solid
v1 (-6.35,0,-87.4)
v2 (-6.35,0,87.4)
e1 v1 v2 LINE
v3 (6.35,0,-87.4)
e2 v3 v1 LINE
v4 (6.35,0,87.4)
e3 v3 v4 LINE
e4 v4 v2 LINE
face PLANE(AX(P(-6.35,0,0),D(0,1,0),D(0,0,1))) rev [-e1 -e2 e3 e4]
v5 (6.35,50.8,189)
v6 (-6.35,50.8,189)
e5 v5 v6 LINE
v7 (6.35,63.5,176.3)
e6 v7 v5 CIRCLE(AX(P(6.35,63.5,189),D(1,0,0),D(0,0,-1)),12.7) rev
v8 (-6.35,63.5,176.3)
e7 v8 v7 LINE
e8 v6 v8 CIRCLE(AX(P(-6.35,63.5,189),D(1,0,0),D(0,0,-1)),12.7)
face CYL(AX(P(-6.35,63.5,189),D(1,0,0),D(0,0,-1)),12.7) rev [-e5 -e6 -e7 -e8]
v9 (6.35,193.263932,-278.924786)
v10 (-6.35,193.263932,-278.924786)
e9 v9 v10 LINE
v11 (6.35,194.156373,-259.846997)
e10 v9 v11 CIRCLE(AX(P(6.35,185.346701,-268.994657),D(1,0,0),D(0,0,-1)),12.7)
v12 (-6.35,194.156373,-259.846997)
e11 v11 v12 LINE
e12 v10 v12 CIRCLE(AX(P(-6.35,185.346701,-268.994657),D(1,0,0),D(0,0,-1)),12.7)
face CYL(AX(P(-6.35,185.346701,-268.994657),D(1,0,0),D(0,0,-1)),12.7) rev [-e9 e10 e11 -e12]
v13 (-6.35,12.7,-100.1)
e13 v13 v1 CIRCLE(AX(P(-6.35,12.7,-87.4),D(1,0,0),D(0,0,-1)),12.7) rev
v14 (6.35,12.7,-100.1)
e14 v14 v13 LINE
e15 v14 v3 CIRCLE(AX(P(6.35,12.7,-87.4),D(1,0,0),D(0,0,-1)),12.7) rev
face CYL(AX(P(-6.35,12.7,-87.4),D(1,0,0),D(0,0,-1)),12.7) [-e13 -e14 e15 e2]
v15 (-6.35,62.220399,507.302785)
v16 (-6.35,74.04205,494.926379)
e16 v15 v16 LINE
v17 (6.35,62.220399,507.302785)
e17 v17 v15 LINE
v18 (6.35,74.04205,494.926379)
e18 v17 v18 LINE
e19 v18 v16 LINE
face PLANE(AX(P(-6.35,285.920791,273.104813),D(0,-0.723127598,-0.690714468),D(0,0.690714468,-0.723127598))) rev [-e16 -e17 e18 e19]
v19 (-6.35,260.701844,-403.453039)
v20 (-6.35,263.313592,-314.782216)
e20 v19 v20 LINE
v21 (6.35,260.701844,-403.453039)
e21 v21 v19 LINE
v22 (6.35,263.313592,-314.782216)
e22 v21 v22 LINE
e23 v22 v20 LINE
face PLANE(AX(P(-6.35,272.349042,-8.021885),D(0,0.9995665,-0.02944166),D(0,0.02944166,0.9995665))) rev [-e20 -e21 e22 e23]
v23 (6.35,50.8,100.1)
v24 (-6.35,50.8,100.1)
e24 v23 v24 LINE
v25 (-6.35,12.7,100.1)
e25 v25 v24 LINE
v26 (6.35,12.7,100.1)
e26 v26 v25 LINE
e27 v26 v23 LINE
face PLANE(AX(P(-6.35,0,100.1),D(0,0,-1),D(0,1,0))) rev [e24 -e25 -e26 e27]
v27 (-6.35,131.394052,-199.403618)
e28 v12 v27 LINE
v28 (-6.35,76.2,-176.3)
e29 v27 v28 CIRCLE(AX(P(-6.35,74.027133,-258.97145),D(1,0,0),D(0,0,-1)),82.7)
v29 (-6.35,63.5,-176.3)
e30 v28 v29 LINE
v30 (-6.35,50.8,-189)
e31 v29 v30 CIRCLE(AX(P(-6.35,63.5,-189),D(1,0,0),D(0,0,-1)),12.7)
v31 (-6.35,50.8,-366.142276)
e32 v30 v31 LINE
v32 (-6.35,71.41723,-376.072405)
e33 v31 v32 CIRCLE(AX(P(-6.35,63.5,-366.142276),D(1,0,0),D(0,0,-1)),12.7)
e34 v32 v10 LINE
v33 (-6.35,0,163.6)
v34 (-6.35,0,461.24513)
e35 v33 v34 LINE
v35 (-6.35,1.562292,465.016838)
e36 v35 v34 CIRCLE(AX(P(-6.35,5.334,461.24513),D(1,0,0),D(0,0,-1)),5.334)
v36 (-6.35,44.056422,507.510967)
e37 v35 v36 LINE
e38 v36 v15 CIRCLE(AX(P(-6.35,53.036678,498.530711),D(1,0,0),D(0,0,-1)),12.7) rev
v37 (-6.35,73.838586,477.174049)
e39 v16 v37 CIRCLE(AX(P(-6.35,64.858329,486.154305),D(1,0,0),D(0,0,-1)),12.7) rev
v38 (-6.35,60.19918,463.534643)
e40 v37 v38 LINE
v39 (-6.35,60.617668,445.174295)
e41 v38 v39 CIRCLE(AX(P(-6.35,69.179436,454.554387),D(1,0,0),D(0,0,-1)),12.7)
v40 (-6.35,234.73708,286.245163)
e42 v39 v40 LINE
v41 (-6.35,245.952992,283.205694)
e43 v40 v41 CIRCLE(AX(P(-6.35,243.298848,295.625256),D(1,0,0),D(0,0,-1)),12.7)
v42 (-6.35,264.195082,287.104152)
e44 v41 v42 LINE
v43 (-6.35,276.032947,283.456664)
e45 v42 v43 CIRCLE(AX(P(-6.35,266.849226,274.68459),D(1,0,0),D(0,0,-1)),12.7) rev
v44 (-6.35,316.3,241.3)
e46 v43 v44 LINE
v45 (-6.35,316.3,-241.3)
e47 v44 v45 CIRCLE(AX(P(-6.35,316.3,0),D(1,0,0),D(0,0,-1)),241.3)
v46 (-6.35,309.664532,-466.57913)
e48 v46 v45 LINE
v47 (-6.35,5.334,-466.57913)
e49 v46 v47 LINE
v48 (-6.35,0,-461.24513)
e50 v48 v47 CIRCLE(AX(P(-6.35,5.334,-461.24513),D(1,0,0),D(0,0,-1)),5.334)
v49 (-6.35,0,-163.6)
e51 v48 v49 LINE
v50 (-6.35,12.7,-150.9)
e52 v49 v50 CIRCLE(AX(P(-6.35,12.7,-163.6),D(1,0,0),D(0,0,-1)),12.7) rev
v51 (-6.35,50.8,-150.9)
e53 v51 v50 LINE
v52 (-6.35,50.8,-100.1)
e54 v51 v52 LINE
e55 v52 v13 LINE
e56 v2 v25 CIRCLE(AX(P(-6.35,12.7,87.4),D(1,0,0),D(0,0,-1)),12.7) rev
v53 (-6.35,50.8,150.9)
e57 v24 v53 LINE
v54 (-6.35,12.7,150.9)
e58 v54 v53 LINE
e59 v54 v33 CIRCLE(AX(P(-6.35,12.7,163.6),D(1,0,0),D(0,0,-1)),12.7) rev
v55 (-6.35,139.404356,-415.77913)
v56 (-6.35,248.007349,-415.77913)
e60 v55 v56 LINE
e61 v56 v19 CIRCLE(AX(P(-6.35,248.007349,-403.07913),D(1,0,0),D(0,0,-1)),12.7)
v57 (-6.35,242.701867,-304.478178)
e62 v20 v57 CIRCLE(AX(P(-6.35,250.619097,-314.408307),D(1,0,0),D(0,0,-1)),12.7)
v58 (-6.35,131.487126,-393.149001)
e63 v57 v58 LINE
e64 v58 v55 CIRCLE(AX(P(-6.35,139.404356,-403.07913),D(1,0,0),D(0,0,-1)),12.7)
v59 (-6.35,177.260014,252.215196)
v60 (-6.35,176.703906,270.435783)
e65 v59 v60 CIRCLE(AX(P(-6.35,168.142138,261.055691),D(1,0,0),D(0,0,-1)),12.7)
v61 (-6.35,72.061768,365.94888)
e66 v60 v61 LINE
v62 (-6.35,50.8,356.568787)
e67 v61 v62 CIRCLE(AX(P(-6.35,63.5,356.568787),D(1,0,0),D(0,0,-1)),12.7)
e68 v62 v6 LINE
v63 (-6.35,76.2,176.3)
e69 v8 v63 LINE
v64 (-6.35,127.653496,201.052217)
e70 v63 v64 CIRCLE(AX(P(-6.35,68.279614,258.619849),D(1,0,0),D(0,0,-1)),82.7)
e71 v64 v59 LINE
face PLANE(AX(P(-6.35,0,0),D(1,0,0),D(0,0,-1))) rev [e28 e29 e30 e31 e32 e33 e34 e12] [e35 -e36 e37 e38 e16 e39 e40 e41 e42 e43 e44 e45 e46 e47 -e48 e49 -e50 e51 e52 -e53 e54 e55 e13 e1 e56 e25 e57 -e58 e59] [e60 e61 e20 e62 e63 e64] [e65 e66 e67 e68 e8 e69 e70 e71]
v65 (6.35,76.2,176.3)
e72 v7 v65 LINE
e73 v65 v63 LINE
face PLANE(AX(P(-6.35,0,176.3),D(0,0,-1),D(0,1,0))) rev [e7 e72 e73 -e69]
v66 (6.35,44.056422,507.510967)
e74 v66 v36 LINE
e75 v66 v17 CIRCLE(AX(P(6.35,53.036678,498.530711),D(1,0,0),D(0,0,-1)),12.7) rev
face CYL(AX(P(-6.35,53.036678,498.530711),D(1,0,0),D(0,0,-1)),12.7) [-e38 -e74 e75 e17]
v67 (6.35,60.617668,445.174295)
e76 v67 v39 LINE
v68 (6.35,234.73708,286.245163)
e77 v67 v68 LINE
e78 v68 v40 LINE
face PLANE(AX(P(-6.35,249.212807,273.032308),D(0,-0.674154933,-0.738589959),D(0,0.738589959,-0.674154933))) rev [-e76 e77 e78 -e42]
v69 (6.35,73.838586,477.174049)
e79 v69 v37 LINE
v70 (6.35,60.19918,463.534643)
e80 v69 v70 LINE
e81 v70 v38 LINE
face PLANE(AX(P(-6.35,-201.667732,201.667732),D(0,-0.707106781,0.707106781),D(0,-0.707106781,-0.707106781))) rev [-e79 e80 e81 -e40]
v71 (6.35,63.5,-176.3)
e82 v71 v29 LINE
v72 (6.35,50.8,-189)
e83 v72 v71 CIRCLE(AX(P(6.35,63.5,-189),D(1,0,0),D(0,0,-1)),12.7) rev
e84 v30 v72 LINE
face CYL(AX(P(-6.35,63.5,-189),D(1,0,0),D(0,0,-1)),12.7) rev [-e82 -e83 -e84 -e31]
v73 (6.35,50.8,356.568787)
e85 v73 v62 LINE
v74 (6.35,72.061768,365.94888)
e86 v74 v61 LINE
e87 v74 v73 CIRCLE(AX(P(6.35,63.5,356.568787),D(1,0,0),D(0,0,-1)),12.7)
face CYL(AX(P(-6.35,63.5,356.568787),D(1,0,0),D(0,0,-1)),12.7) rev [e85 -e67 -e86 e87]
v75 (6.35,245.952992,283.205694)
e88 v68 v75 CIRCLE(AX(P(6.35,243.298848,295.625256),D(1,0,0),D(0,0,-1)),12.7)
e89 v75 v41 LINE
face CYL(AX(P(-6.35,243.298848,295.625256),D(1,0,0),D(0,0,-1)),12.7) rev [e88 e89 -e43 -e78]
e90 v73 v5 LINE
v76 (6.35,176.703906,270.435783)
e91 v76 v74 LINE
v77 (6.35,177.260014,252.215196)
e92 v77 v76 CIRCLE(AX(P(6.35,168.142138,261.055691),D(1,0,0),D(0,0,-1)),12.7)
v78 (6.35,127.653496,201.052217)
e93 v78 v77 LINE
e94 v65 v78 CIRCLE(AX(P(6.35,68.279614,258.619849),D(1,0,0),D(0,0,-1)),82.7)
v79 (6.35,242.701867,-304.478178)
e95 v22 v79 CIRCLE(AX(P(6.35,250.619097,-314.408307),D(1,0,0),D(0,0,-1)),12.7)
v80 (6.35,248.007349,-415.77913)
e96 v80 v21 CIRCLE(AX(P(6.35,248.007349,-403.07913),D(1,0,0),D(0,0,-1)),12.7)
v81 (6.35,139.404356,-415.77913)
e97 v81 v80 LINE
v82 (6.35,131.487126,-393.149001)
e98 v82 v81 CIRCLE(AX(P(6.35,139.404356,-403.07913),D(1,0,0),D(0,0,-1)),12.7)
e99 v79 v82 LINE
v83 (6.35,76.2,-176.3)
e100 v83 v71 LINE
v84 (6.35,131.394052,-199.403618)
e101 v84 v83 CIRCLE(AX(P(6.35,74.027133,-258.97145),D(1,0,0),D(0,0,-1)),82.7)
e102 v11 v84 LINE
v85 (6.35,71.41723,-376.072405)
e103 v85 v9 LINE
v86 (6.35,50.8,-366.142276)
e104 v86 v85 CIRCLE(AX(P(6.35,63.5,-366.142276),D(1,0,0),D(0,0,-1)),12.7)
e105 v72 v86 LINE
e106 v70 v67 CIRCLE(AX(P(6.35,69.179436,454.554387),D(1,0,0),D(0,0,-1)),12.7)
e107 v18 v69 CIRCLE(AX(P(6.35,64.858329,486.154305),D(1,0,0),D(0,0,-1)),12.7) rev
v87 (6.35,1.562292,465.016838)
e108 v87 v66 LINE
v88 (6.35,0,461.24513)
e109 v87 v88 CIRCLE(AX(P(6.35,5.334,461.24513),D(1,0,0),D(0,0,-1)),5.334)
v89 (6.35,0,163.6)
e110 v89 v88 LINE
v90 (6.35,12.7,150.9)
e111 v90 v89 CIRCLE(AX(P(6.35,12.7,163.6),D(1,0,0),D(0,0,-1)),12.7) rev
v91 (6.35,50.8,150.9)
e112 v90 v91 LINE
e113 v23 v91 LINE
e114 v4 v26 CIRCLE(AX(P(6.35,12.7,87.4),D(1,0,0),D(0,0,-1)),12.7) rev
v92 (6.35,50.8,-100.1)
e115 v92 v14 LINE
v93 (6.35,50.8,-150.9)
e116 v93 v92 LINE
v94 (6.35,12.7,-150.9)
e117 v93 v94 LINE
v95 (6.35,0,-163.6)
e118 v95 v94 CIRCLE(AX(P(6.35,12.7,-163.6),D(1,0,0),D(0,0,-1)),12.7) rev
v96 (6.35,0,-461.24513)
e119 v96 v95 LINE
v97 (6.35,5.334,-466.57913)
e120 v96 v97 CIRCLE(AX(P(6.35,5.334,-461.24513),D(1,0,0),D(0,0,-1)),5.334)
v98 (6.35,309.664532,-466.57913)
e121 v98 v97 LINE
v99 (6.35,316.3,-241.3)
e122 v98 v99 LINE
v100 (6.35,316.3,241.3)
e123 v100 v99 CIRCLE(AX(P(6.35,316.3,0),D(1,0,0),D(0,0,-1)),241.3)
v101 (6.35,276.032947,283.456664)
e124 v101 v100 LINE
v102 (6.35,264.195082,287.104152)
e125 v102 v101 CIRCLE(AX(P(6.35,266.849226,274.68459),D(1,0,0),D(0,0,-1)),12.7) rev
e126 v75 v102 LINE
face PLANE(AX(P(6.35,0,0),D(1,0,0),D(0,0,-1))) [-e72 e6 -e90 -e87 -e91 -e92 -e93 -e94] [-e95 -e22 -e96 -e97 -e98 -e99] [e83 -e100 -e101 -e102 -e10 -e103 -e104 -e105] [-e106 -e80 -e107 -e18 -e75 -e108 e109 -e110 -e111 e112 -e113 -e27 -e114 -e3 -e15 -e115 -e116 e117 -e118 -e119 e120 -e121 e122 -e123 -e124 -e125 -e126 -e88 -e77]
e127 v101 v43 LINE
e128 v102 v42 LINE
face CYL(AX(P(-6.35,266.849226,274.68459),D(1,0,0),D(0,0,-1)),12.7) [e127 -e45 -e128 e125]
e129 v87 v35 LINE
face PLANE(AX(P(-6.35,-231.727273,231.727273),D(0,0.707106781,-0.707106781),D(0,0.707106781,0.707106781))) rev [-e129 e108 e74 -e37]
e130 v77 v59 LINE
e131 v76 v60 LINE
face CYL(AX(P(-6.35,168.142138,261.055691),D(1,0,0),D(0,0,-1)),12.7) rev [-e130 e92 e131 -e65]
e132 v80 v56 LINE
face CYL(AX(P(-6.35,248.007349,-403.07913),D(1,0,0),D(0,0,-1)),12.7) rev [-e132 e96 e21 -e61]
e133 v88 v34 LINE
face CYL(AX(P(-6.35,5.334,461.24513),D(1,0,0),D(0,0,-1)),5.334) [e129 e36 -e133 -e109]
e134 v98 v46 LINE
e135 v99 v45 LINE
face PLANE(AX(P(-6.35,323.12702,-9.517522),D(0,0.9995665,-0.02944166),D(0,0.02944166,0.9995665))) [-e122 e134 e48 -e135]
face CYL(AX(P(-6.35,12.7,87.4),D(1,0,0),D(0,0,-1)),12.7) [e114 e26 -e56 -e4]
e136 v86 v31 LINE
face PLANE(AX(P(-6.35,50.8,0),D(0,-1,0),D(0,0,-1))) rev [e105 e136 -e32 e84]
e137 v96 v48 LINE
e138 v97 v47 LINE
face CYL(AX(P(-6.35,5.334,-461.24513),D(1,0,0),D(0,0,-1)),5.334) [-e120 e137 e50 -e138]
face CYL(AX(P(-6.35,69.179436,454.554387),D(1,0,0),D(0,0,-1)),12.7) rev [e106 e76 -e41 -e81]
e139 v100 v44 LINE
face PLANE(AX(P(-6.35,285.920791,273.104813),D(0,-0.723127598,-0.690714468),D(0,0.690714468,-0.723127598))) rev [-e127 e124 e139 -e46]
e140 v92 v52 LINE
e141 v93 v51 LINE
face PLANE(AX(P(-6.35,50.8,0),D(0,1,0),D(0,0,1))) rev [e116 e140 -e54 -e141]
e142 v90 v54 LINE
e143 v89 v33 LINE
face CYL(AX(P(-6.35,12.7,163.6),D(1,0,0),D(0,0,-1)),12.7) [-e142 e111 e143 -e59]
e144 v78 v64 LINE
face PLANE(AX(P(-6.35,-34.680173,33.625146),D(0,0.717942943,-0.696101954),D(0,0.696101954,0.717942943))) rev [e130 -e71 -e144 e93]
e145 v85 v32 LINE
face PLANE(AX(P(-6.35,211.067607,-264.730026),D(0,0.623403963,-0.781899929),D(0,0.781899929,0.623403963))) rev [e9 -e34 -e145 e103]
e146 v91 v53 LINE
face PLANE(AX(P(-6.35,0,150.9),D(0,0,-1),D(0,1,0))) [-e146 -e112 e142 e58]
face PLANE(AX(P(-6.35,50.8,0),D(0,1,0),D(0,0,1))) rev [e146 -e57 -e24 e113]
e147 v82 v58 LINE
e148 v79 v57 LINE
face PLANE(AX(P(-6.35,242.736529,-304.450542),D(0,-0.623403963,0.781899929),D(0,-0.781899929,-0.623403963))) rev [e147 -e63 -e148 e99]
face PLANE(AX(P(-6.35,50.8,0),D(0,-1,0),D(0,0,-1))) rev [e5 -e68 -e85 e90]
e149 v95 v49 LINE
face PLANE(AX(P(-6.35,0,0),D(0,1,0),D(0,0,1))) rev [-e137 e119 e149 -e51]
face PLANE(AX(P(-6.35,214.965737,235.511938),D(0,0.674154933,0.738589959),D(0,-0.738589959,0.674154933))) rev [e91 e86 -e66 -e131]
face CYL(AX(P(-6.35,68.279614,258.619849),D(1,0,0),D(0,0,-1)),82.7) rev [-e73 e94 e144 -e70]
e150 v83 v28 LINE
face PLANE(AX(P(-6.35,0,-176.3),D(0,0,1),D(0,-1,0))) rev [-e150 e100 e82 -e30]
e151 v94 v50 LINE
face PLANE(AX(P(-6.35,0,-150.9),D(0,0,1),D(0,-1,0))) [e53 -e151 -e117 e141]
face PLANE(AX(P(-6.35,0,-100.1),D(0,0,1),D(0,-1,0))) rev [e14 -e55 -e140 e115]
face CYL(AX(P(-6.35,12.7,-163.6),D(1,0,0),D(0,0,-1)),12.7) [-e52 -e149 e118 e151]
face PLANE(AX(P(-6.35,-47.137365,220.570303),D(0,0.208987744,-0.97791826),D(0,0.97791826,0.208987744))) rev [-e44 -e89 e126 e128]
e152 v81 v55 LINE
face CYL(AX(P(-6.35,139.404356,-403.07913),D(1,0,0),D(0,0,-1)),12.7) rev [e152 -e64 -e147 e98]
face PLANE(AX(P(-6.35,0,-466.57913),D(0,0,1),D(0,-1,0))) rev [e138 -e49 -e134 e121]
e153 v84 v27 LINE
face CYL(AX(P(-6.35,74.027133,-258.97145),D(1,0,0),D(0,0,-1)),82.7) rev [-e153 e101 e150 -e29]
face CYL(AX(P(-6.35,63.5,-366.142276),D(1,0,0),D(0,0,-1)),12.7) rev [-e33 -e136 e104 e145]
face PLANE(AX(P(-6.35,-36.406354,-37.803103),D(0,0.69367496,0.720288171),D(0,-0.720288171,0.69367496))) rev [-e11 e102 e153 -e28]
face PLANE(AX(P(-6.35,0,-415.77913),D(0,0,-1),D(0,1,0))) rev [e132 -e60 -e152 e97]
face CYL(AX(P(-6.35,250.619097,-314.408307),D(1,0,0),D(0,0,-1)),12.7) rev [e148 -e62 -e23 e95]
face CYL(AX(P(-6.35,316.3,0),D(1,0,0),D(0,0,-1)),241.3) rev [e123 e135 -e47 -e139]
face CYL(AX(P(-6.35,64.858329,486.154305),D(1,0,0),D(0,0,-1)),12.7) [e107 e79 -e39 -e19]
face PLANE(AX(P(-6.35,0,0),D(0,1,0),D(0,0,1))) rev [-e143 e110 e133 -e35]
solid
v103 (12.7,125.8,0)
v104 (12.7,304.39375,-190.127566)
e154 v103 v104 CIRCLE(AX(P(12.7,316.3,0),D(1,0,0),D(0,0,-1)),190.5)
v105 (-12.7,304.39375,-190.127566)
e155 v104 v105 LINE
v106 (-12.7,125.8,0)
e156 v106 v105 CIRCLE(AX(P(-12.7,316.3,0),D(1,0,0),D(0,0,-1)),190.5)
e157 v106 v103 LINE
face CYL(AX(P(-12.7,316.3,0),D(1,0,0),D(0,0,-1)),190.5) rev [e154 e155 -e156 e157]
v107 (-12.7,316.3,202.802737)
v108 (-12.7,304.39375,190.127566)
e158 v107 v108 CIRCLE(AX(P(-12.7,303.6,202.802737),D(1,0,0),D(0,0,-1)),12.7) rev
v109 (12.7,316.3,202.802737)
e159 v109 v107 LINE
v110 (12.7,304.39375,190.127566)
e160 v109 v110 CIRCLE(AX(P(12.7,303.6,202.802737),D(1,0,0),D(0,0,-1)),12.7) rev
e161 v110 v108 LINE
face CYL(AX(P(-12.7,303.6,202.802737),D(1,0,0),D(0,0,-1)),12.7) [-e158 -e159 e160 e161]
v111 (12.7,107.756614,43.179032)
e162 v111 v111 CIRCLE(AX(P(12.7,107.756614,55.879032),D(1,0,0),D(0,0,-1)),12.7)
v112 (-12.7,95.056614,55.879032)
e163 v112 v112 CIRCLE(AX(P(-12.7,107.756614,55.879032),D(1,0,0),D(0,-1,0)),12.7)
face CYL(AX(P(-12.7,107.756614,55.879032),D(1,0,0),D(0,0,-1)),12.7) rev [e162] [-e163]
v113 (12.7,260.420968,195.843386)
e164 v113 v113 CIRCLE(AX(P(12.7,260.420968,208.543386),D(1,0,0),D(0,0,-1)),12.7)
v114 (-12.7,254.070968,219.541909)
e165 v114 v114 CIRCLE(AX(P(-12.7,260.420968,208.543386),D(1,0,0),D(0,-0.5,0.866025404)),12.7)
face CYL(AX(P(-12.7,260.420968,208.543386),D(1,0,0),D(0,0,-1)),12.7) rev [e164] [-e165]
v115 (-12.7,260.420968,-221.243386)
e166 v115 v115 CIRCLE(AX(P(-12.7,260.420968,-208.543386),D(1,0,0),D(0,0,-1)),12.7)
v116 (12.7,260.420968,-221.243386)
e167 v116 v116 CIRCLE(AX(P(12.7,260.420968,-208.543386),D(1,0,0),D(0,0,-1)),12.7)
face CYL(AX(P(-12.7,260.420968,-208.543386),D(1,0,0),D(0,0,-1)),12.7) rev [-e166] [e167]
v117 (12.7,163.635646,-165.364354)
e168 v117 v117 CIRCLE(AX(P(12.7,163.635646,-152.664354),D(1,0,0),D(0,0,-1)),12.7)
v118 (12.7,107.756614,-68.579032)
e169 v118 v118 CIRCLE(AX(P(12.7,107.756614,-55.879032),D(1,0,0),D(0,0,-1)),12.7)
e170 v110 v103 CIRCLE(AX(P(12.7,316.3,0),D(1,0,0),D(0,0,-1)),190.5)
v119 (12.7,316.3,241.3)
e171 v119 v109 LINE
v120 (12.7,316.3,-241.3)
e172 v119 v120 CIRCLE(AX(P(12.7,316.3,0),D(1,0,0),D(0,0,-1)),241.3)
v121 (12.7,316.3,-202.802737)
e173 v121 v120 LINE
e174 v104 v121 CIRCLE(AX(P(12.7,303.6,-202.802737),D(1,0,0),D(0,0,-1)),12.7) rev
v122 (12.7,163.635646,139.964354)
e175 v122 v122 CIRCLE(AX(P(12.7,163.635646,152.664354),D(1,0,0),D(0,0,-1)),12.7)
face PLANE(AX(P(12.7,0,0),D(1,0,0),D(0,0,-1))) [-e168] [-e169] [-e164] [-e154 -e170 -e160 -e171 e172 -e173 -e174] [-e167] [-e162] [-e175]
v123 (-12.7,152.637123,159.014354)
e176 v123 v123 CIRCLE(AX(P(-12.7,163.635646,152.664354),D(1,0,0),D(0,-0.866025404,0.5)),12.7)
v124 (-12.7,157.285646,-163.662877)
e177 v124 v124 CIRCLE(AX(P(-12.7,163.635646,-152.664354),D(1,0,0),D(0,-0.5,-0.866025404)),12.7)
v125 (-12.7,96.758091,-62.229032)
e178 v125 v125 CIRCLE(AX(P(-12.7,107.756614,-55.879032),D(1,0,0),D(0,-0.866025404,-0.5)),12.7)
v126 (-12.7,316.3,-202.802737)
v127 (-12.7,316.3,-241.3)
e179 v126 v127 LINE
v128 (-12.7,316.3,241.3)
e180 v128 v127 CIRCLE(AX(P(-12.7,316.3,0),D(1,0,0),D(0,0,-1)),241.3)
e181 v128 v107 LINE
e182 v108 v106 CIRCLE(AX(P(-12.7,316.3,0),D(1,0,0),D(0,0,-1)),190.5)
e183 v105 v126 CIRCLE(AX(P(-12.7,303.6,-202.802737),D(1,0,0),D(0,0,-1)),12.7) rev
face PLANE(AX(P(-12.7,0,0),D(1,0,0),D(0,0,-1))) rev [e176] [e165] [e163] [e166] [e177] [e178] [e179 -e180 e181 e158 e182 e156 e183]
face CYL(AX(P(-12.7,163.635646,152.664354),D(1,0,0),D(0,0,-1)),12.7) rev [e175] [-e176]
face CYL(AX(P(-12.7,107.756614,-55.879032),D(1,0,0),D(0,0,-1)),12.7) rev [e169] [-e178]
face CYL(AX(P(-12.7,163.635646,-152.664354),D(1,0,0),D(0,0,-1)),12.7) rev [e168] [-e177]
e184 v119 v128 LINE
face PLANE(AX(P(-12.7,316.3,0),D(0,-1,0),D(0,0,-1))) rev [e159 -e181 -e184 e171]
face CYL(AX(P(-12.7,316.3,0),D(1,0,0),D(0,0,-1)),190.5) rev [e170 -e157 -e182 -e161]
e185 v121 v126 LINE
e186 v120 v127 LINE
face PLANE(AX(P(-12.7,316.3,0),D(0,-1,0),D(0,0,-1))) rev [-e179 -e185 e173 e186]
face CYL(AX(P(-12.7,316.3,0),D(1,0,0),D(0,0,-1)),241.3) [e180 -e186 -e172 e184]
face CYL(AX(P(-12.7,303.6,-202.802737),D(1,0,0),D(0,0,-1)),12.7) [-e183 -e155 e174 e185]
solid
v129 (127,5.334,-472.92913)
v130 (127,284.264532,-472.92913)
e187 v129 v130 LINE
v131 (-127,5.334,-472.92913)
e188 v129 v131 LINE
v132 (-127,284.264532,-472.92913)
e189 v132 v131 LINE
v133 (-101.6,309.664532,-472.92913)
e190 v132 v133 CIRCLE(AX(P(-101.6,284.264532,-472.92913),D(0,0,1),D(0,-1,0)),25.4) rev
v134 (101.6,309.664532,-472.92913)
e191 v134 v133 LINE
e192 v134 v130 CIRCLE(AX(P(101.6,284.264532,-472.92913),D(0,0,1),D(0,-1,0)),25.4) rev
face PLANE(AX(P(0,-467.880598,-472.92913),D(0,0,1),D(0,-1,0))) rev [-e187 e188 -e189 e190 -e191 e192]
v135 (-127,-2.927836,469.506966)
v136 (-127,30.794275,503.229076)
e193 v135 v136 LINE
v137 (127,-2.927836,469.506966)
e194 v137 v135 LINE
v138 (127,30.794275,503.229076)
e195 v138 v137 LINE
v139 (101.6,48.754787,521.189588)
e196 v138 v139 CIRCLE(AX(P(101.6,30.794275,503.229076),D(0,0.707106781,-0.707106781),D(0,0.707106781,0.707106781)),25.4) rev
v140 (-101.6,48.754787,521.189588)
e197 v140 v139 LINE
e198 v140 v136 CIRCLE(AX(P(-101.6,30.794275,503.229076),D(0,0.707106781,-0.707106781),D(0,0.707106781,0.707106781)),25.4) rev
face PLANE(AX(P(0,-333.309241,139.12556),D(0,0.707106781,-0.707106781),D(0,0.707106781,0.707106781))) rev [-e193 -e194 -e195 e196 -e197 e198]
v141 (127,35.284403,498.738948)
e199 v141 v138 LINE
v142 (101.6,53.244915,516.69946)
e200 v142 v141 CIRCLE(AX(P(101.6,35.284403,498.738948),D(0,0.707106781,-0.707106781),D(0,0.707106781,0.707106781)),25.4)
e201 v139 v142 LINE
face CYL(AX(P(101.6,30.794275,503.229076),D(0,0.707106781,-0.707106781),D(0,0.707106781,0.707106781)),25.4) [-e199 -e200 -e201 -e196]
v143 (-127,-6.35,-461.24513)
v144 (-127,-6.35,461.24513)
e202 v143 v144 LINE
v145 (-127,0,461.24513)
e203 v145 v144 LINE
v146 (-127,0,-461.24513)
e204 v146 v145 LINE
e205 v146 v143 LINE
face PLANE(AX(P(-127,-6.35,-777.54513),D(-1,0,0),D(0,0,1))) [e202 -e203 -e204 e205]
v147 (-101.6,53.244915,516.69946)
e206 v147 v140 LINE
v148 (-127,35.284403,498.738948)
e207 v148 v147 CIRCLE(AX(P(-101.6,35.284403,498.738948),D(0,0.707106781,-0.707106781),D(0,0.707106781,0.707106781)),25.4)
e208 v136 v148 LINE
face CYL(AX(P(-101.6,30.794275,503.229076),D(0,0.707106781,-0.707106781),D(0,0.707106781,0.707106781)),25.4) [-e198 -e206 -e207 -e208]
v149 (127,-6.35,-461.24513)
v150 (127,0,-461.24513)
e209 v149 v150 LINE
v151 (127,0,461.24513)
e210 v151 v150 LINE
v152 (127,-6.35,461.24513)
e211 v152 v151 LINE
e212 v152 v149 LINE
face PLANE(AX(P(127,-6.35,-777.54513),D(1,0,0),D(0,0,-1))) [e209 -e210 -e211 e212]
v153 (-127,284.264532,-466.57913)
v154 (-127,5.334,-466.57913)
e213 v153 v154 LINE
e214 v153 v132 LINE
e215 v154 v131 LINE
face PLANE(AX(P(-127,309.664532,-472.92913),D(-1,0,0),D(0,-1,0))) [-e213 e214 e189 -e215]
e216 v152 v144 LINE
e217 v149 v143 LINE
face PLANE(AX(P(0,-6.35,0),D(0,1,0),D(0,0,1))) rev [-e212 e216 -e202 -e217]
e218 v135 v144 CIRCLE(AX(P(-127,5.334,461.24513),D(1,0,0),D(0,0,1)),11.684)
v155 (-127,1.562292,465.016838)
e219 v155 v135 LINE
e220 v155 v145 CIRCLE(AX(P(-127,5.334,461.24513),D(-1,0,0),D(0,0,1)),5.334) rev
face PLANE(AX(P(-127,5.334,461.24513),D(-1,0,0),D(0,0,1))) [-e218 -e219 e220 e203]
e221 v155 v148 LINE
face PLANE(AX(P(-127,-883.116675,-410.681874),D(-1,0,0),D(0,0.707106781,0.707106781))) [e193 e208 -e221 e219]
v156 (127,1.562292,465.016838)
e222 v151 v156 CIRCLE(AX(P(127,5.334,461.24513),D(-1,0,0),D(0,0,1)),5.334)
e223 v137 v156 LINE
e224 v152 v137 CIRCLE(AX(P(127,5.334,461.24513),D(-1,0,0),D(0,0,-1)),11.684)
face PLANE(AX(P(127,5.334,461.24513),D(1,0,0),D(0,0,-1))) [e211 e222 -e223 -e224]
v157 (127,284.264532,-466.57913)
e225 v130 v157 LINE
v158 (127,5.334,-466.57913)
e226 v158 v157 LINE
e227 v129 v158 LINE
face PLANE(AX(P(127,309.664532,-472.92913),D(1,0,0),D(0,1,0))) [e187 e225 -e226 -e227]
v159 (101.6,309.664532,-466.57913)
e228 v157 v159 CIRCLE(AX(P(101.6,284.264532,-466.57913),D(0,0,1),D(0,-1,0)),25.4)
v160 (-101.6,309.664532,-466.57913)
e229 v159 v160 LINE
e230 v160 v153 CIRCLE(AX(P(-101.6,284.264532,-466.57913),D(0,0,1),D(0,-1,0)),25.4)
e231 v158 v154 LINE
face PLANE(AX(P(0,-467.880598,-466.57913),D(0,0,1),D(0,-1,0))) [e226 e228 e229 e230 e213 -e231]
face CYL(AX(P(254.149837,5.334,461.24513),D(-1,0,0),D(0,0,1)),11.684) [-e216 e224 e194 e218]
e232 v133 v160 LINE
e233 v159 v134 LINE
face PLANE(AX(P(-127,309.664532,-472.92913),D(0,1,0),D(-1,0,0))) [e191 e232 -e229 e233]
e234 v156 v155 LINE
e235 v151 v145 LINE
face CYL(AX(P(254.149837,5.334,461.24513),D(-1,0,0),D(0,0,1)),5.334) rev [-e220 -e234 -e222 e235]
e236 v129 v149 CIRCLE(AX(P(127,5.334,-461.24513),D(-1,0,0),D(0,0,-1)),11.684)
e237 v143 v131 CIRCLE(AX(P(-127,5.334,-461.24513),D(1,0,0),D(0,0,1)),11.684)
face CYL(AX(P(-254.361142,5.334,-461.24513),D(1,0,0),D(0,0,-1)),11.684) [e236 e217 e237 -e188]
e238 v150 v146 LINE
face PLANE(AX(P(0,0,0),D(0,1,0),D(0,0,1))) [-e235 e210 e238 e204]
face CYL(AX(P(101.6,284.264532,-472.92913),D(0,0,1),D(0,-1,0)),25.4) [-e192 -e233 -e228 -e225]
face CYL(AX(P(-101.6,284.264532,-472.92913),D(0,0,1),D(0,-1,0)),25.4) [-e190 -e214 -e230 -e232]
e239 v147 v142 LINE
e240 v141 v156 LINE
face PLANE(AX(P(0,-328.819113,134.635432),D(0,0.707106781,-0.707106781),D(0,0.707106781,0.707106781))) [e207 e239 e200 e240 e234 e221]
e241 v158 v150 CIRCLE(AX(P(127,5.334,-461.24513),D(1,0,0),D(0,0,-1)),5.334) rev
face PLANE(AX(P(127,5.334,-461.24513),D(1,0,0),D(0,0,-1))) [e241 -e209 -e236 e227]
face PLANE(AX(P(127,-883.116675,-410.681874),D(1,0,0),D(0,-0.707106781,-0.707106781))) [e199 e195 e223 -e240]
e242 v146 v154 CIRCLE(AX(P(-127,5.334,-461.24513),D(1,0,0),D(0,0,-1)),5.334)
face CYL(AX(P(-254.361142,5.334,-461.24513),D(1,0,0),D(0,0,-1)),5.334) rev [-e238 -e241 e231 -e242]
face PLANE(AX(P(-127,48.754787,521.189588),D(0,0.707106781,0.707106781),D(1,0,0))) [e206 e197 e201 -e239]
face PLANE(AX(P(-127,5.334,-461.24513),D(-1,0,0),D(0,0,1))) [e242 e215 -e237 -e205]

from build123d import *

# Parameters (mm, degrees)
FLANGE_PROFILE_DEPTH              = 12.7
F_7_8_1_DIAMETER_HOLE1_D          = 25.4
BOLT_PATTERN_COUNT                = 12
SKETCH5_W                         = 254
SKETCH5_H                         = 1317.865260112
BASE_SKID_DEPTH                   = 6.35
BEND_START                        = -127
BEND_HEEL_DEPTH                   = 254
BEND_HEEL_2_DEPTH                 = 254
BEND_TOE_DEPTH                    = 254
BEND_TOE_2_DEPTH                  = 254
WEBBING_BODY_DEPTH                = 6.35
WEBBING_HOLES_DEPTH               = 623.746559258
WEBBING_HOLES_DEPTH_BACK          = 623.746559258
CROSSBEAM_DEPTH                   = 623.746559258
CROSSBEAM_DEPTH_BACK              = 623.746559258
CROSSMEMBER_W                     = 50.8
CROSSMEMBER_H                     = 50.8
CROSSBEAM_CLEARANCE_DEPTH         = 6.35
CROSSBEAM_FILLET_R                = 12.7
FILLET_CLEARANCE_R                = 82.7
WEBBING_FILLET_R                  = 12.7
SKID_START                        = -474
SKID_EDGES_DEPTH                  = 8
SKID_START_2                      = -335
SKID_EDGES_2_DEPTH                = 8
FLANGE_FILLET_R                   = 12.7
CONVERT_START                     = -12.7
CONVERT_FLANGE_TO_SHEET_OUTLINE_R = 12.7
CONVERT_FLANGE_TO_SHEET_DEPTH     = 25.4
CONVERT_START_2                   = -6.35
CONVERT_WEBBING_TO_SHEET_DEPTH    = 12.7
FILLET2_R                         = 12.7


with BuildPart() as part:
    # Sketch1 → Flange Profile (new, symmetric)
    with BuildSketch(Plane(origin=(0, 0, 0), x_dir=(0, 0, -1), z_dir=(1, 0, 0))):
        with BuildLine():
            Line((241.3, 316.3), (190.5, 316.3))
            ThreePointArc((190.5, 316.3), (0, 125.8), (-190.5, 316.3))
            Line((-190.5, 316.3), (-241.3, 316.3))
            ThreePointArc((-241.3, 316.3), (0, 75), (241.3, 316.3))
        make_face()
    extrude(amount=FLANGE_PROFILE_DEPTH, both=True)

    # 7/8 (1) Diameter Hole1 (through all)
    with Locations(Plane(origin=(12.7, 260.420968162, -208.543385896), x_dir=(0, 0, 1), z_dir=(1, 0, 0))):
        with Locations((0, 0)):
            f_7_8_1_diameter_hole1 = Hole(F_7_8_1_DIAMETER_HOLE1_D / 2)

    # Bolt Pattern: 7/8 (1) Diameter Hole1 ×12 about axis
    bolt_pattern_axis = Axis((0, 316.3, 0), (1, 0, 0))
    for i in range(1, BOLT_PATTERN_COUNT):
        add(f_7_8_1_diameter_hole1.rotate(bolt_pattern_axis, i * 360 / BOLT_PATTERN_COUNT), mode=Mode.SUBTRACT)

    # Flange Fillet
    flange_fillet_edges = [part.edges().sort_by_distance(p)[0] for p in [
        (0, 316.3, 190.5),
        (0, 316.3, -190.5),
    ]]
    fillet(flange_fillet_edges, radius=FLANGE_FILLET_R)


with BuildPart() as body_2:
    # Base Skid: sheet metal written as solids
    # Sketch5 → Base Skid (new body)
    with BuildSketch(Plane(origin=(0, 0, 0), x_dir=(1, 0, 0), z_dir=(0, 1, 0))):
        with Locations((0, 118.6125)):
            Rectangle(SKETCH5_W, SKETCH5_H)
    extrude(amount=-BASE_SKID_DEPTH)

    # Bend Heel: read off the stored shape, not the designer's step
    # Bend Heel outline → Bend Heel (cut)
    with BuildSketch(Plane.YZ.offset(BEND_START)):
        with BuildLine():
            Line((0, -777.545130056), (0, -471.640528076))
            ThreePointArc((0, -471.640528076), (-4.636915504, -467.33583609), (-6.35, -461.245130056))
            Line((-6.35, -461.245130056), (-6.35, -777.545130056))
            Line((-6.35, -777.545130056), (0, -777.545130056))
        make_face()
    extrude(amount=BEND_HEEL_DEPTH, mode=Mode.SUBTRACT)

    # Bend Heel 2 outline → Bend Heel 2 (add)
    with BuildSketch(Plane.YZ.offset(BEND_START)):
        with BuildLine():
            Line((5.334, -472.929130056), (309.66453199, -472.929130056))
            Line((309.66453199, -472.929130056), (309.66453199, -466.579130056))
            Line((309.66453199, -466.579130056), (5.334, -466.579130056))
            ThreePointArc((5.334, -466.579130056), (1.56229243, -465.016837626), (0, -461.245130056))
            Line((0, -461.245130056), (0, -471.640528076))
            ThreePointArc((0, -471.640528076), (2.590277571, -472.602411563), (5.334, -472.929130056))
        make_face()
    extrude(amount=BEND_HEEL_2_DEPTH)

    # Bend Toe: read off the stored shape, not the designer's step
    # Bend Toe outline → Bend Toe (cut)
    with BuildSketch(Plane.YZ.offset(BEND_START)):
        with BuildLine():
            Line((-6.35, 540.320130056), (-6.35, 461.245130056))
            ThreePointArc((-6.35, 461.245130056), (-5.460608458, 465.71640328), (-2.927835631, 469.506965687))
            Line((-2.927835631, 469.506965687), (0, 472.434801318))
            Line((0, 472.434801318), (0, 540.320130056))
            Line((0, 540.320130056), (-6.35, 540.320130056))
        make_face()
    extrude(amount=BEND_TOE_DEPTH, mode=Mode.SUBTRACT)

    # Bend Toe 2 outline → Bend Toe 2 (add)
    with BuildSketch(Plane.YZ.offset(BEND_START)):
        with BuildLine():
            Line((48.754787092, 521.189588411), (0, 472.434801318))
            Line((0, 472.434801318), (0, 461.245130056))
            ThreePointArc((0, 461.245130056), (0.406026574, 463.286363484), (1.562292429, 465.016837626))
            Line((1.562292429, 465.016837626), (53.244915153, 516.69946035))
            Line((53.244915153, 516.69946035), (48.754787092, 521.189588411))
        make_face()
    extrude(amount=BEND_TOE_2_DEPTH)

    # Skid Edges: read off the stored shape, not the designer's step
    # Skid Edges outline → Skid Edges (cut)
    with BuildSketch(Plane.XY.offset(SKID_START)):
        with BuildLine():
            ThreePointArc((-127, 284.26453199), (-119.560512242, 302.225044232), (-101.6, 309.66453199))
            Line((-101.6, 309.66453199), (-127, 309.66453199))
            Line((-127, 309.66453199), (-127, 284.26453199))
        make_face()
        with BuildLine():
            ThreePointArc((101.6, 309.66453199), (119.560512242, 302.225044232), (127, 284.26453199))
            Line((127, 284.26453199), (127, 309.66453199))
            Line((127, 309.66453199), (101.6, 309.66453199))
        make_face()
    extrude(amount=SKID_EDGES_DEPTH, mode=Mode.SUBTRACT)

    # Skid Edges 2 outline → Skid Edges 2 (cut)
    with BuildSketch(Plane(origin=(0, 0, 0), x_dir=(1, 0, 0), z_dir=(0, 0.707106781186546, -0.707106781186549)).offset(SKID_START_2)):
        with BuildLine():
            Line((-127, -403.011532817), (-101.6, -403.011532817))
            ThreePointArc((-101.6, -403.011532817), (-119.560512242, -395.572045059), (-127, -377.611532817))
            Line((-127, -377.611532817), (-127, -403.011532817))
        make_face()
        with BuildLine():
            ThreePointArc((127, -377.611532817), (119.560512242, -395.572045059), (101.6, -403.011532817))
            Line((101.6, -403.011532817), (127, -403.011532817))
            Line((127, -403.011532817), (127, -377.611532817))
        make_face()
    extrude(amount=SKID_EDGES_2_DEPTH, mode=Mode.SUBTRACT)


with BuildPart() as body_3:
    # Sketch12 → Webbing Body (new, symmetric)
    with BuildSketch(Plane(origin=(0, 0, 0), x_dir=(0, 0, -1), z_dir=(1, 0, 0))):
        with BuildLine():
            Line((-516.69946035, 53.244915153), (-465.016837626, 1.562292429))
            ThreePointArc((-465.016837626, 1.562292429), (-463.286363484, 0.406026574), (-461.245130056, 0))
            Line((-461.245130056, 0), (461.245130056, 0))
            ThreePointArc((461.245130056, 0), (465.016837626, 1.562292429), (466.579130056, 5.334))
            Line((466.579130056, 5.334), (466.579130056, 309.66453199))
            Line((466.579130056, 309.66453199), (241.3, 316.3))
            ThreePointArc((241.3, 316.3), (0, 75), (-241.3, 316.3))
            Line((-241.3, 316.3), (-516.69946035, 53.244915153))
        make_face()
    extrude(amount=WEBBING_BODY_DEPTH, both=True)

    # Sketch13 → Webbing Holes (cut, two sides: drawn at the far end of the back side and taken through both)
    with BuildSketch(Plane(origin=(0, 0, 0), x_dir=(0, 0, -1), z_dir=(1, 0, 0)).offset(-WEBBING_HOLES_DEPTH_BACK)):
        Polygon((415.779130056, 260.338785622), (287.40157486, 264.120073132), (415.779130056, 103.103449381), align=None)
        Polygon((-121.787355666, 50.8), (-385.355758001, 50.8), (-261.612051176, 186.371001392), align=None)
        Polygon((269.894826504, 204.589693285), (392.510394874, 50.8), (121.787355666, 50.8), align=None)
        Polygon((-454.135463722, 50.8), (-485.950787611, 82.615323889), (-288.586784033, 271.132776469), (-281.840137894, 239.563133553), align=None)
    extrude(amount=WEBBING_HOLES_DEPTH + WEBBING_HOLES_DEPTH_BACK, mode=Mode.SUBTRACT)

    # crossmember → Crossbeam (cut, two sides: drawn at the far end of the back side and taken through both)
    with BuildSketch(Plane(origin=(0, 0, 0), x_dir=(0, 0, -1), z_dir=(1, 0, 0)).offset(-CROSSBEAM_DEPTH_BACK)):
        with Locations((125.5, 25.4)):
            Rectangle(CROSSMEMBER_W, CROSSMEMBER_H)
        with Locations((-125.5, 25.4)):
            Rectangle(CROSSMEMBER_W, CROSSMEMBER_H)
    extrude(amount=CROSSBEAM_DEPTH + CROSSBEAM_DEPTH_BACK, mode=Mode.SUBTRACT)

    # crossmember<5> → Crossbeam Clearance (add, symmetric)
    with BuildSketch(Plane(origin=(0, 0, 0), x_dir=(0, 0, -1), z_dir=(1, 0, 0))):
        Polygon((100.1, 50.8), (150.9, 50.8), (150.9, 0), (176.3, 0), (176.3, 76.2), (74.7, 76.2), (74.7, 0), (100.1, 0), align=None)
        Polygon((-100.1, 0), (-74.7, 0), (-74.7, 76.2), (-176.3, 76.2), (-176.3, 0), (-150.9, 0), (-150.9, 50.8), (-100.1, 50.8), align=None)
    extrude(amount=CROSSBEAM_CLEARANCE_DEPTH, both=True)

    # Crossbeam fillet
    crossbeam_fillet_edges = [body_3.edges().sort_by_distance(p)[0] for p in [
        (0, 0, -150.9),
        (0, 0, -100.1),
        (0, 0, 100.1),
        (0, 0, 150.9),
    ]]
    fillet(crossbeam_fillet_edges, radius=CROSSBEAM_FILLET_R)

    # Fillet Clearance
    # the kernel refuses this fillet: 82.7 mm, written as the material it adds along each edge
    with BuildSketch(Plane(origin=(6.35, 76.2, -146.248876324), x_dir=(0, 0, -1), z_dir=(-1, 0, 0))) as fillet_clearance_piece_1:
        with BuildLine():
            CenterArc((112.722573697, 2.172867127), FILLET_CLEARANCE_R, 181.505567644, 42.416154829)
            Line((53.154741922, -55.194052066), (0, 0))
            Line((0, 0), (30.051123676, 0))
        make_face()
    extrude(amount=12.7)
    with BuildSketch(Plane(origin=(-6.35, 76.2, 147.984309509), x_dir=(0, 0.6961019539421004, 0.7179429432190206), z_dir=(1, 0, 0))) as fillet_clearance_piece_2:
        with BuildLine():
            CenterArc((73.916608705, 82.7), FILLET_CLEARANCE_R, 229.610877342, 40.389122658)
            Line((20.32905017, 19.710607478), (0, 0))
            Line((0, 0), (73.916608705, 0))
        make_face()
    extrude(amount=12.7)

    # Webbing Fillet
    webbing_fillet_edges = [body_3.edges().sort_by_distance(p)[0] for p in [
        (0, 53.244915153, 516.69946035),
        (0, 82.615323889, 485.950787611),
        (0, 271.132776469, 288.586784033),
        (0, 239.563133553, 281.840137894),
        (0, 50.8, 454.135463722),
        (0, 204.589693285, -269.894826504),
        (0, 50.8, -392.510394874),
        (0, 186.371001392, 261.612051176),
        (0, 50.8, 385.355758001),
        (0, 260.338785622, -415.779130056),
        (0, 103.103449381, -415.779130056),
        (0, 264.120073132, -287.40157486),
    ]]
    fillet(webbing_fillet_edges, radius=WEBBING_FILLET_R)


with BuildPart() as body_4:
    # Convert Flange to Sheet: read off the stored shape, not the designer's step
    # Convert Flange to Sheet outline → Convert Flange to Sheet (new body)
    with BuildSketch(Plane.YZ.offset(CONVERT_START)):
        with BuildLine():
            ThreePointArc((304.39375, 190.127565626), (312.856636133, 194.107641068), (316.3, 202.802736668))
            Line((316.3, 202.802736668), (316.3, 241.3))
            ThreePointArc((316.3, 241.3), (75, 0), (316.3, -241.3))
            Line((316.3, -241.3), (316.3, -202.802736668))
            ThreePointArc((316.3, -202.802736668), (312.856636133, -194.107641068), (304.39375, -190.127565626))
            ThreePointArc((304.39375, -190.127565626), (125.8, 0), (304.39375, 190.127565626))
        make_face()
        with Locations((163.635645942, -152.664354058)):
            Circle(CONVERT_FLANGE_TO_SHEET_OUTLINE_R, mode=Mode.SUBTRACT)
        with Locations((107.756614104, -55.879031838)):
            Circle(CONVERT_FLANGE_TO_SHEET_OUTLINE_R, mode=Mode.SUBTRACT)
        with Locations((260.420968162, -208.543385896)):
            Circle(CONVERT_FLANGE_TO_SHEET_OUTLINE_R, mode=Mode.SUBTRACT)
        with Locations((107.756614104, 55.879031838)):
            Circle(CONVERT_FLANGE_TO_SHEET_OUTLINE_R, mode=Mode.SUBTRACT)
        with Locations((163.635645942, 152.664354058)):
            Circle(CONVERT_FLANGE_TO_SHEET_OUTLINE_R, mode=Mode.SUBTRACT)
        with Locations((260.420968162, 208.543385896)):
            Circle(CONVERT_FLANGE_TO_SHEET_OUTLINE_R, mode=Mode.SUBTRACT)
    extrude(amount=CONVERT_FLANGE_TO_SHEET_DEPTH)


with BuildPart() as body_5:
    # Convert Webbing to Sheet: read off the stored shape, not the designer's step
    # Convert Webbing to Sheet outline → Convert Webbing to Sheet (new body)
    with BuildSketch(Plane.YZ.offset(CONVERT_START_2)):
        with BuildLine():
            ThreePointArc((12.7, -150.9), (3.719743879, -154.619743879), (0, -163.6))
            Line((0, -163.6), (0, -461.245130056))
            ThreePointArc((0, -461.245130056), (1.56229243, -465.016837626), (5.334, -466.579130056))
            Line((5.334, -466.579130056), (309.66453199, -466.579130056))
            Line((309.66453199, -466.579130056), (316.3, -241.3))
            ThreePointArc((316.3, -241.3), (75, 0), (316.3, 241.3))
            Line((316.3, 241.3), (276.032946761, 283.456663644))
            ThreePointArc((276.032946761, 283.456663644), (270.588863094, 286.821521817), (264.195081913, 287.104151799))
            Line((264.195081913, 287.104151799), (245.952992349, 283.205693921))
            ThreePointArc((245.952992349, 283.205693921), (239.977011634, 283.367384751), (234.737080357, 286.245163347))
            Line((234.737080357, 286.245163347), (60.617668132, 445.174294781))
            ThreePointArc((60.617668132, 445.174294781), (56.482733464, 454.264990592), (60.199179654, 463.534643376))
            Line((60.199179654, 463.534643376), (73.838585609, 477.174049331))
            ThreePointArc((73.838585609, 477.174049331), (77.557495428, 486.008756787), (74.042049988, 494.926379196))
            Line((74.042049988, 494.926379196), (62.220398575, 507.302784775))
            ThreePointArc((62.220398575, 507.302784775), (53.18222674, 511.229876971), (44.056421954, 507.510967151))
            Line((44.056421954, 507.510967151), (1.562292429, 465.016837626))
            ThreePointArc((1.562292429, 465.016837626), (0.406026574, 463.286363484), (0, 461.245130056))
            Line((0, 461.245130056), (0, 163.6))
            ThreePointArc((0, 163.6), (3.719743879, 154.619743879), (12.7, 150.9))
            Line((12.7, 150.9), (50.8, 150.9))
            Line((50.8, 150.9), (50.8, 100.1))
            Line((50.8, 100.1), (12.7, 100.1))
            ThreePointArc((12.7, 100.1), (3.719743879, 96.380256121), (0, 87.4))
            Line((0, 87.4), (0, -87.4))
            ThreePointArc((0, -87.4), (3.719743879, -96.380256121), (12.7, -100.1))
            Line((12.7, -100.1), (50.8, -100.1))
            Line((50.8, -100.1), (50.8, -150.9))
            Line((50.8, -150.9), (12.7, -150.9))
        make_face()
        with BuildLine():
            Line((131.394052066, -199.403618246), (194.156373438, -259.846997017))
            ThreePointArc((194.156373438, -259.846997017), (198.032828609, -269.588102319), (193.263931773, -278.924785894))
            Line((193.263931773, -278.924785894), (71.417230327, -376.07240504))
            ThreePointArc((71.417230327, -376.07240504), (57.98904841, -377.584278062), (50.8, -366.142275939))
            Line((50.8, -366.142275939), (50.8, -176.3))
            Line((50.8, -176.3), (76.2, -176.3))
            ThreePointArc((76.2, -176.3), (105.959731151, -182.685152645), (131.394052066, -199.403618246))
        make_face(mode=Mode.SUBTRACT)
        with BuildLine():
            Line((248.00734903, -415.779130056), (139.404356101, -415.779130056))
            ThreePointArc((139.404356101, -415.779130056), (127.41680757, -407.273016107), (131.487125774, -393.149000955))
            Line((131.487125774, -393.149000955), (242.701867121, -304.478177637))
            ThreePointArc((242.701867121, -304.478177637), (256.297905781, -303.048679283), (263.313592002, -314.782215819))
            Line((263.313592002, -314.782215819), (260.701843584, -403.453039137))
            ThreePointArc((260.701843584, -403.453039137), (256.854420711, -412.190624042), (248.00734903, -415.779130056))
        make_face(mode=Mode.SUBTRACT)
        with BuildLine():
            Line((177.260013842, 252.215196046), (127.653495748, 201.052217116))
            ThreePointArc((127.653495748, 201.052217116), (104.130662555, 184.094736548), (76.2, 176.3))
            Line((76.2, 176.3), (50.8, 176.3))
            Line((50.8, 176.3), (50.8, 356.568787103))
            ThreePointArc((50.8, 356.568787103), (58.373814726, 368.18826319), (72.061767643, 365.948879577))
            Line((72.061767643, 365.948879577), (176.703906107, 270.435783335))
            ThreePointArc((176.703906107, 270.435783335), (180.836227428, 261.443125193), (177.260013842, 252.215196046))
        make_face(mode=Mode.SUBTRACT)
    extrude(amount=CONVERT_WEBBING_TO_SHEET_DEPTH)

    # Fillet2
    fillet2_edges = [body_5.edges().sort_by_distance(p)[0] for p in [
        (0, 50.8, 176.3),
        (0, 50.8, -176.3),
    ]]
    fillet(fillet2_edges, radius=FILLET2_R)


solid = Compound([body_2.part, body_4.part, body_5.part])
